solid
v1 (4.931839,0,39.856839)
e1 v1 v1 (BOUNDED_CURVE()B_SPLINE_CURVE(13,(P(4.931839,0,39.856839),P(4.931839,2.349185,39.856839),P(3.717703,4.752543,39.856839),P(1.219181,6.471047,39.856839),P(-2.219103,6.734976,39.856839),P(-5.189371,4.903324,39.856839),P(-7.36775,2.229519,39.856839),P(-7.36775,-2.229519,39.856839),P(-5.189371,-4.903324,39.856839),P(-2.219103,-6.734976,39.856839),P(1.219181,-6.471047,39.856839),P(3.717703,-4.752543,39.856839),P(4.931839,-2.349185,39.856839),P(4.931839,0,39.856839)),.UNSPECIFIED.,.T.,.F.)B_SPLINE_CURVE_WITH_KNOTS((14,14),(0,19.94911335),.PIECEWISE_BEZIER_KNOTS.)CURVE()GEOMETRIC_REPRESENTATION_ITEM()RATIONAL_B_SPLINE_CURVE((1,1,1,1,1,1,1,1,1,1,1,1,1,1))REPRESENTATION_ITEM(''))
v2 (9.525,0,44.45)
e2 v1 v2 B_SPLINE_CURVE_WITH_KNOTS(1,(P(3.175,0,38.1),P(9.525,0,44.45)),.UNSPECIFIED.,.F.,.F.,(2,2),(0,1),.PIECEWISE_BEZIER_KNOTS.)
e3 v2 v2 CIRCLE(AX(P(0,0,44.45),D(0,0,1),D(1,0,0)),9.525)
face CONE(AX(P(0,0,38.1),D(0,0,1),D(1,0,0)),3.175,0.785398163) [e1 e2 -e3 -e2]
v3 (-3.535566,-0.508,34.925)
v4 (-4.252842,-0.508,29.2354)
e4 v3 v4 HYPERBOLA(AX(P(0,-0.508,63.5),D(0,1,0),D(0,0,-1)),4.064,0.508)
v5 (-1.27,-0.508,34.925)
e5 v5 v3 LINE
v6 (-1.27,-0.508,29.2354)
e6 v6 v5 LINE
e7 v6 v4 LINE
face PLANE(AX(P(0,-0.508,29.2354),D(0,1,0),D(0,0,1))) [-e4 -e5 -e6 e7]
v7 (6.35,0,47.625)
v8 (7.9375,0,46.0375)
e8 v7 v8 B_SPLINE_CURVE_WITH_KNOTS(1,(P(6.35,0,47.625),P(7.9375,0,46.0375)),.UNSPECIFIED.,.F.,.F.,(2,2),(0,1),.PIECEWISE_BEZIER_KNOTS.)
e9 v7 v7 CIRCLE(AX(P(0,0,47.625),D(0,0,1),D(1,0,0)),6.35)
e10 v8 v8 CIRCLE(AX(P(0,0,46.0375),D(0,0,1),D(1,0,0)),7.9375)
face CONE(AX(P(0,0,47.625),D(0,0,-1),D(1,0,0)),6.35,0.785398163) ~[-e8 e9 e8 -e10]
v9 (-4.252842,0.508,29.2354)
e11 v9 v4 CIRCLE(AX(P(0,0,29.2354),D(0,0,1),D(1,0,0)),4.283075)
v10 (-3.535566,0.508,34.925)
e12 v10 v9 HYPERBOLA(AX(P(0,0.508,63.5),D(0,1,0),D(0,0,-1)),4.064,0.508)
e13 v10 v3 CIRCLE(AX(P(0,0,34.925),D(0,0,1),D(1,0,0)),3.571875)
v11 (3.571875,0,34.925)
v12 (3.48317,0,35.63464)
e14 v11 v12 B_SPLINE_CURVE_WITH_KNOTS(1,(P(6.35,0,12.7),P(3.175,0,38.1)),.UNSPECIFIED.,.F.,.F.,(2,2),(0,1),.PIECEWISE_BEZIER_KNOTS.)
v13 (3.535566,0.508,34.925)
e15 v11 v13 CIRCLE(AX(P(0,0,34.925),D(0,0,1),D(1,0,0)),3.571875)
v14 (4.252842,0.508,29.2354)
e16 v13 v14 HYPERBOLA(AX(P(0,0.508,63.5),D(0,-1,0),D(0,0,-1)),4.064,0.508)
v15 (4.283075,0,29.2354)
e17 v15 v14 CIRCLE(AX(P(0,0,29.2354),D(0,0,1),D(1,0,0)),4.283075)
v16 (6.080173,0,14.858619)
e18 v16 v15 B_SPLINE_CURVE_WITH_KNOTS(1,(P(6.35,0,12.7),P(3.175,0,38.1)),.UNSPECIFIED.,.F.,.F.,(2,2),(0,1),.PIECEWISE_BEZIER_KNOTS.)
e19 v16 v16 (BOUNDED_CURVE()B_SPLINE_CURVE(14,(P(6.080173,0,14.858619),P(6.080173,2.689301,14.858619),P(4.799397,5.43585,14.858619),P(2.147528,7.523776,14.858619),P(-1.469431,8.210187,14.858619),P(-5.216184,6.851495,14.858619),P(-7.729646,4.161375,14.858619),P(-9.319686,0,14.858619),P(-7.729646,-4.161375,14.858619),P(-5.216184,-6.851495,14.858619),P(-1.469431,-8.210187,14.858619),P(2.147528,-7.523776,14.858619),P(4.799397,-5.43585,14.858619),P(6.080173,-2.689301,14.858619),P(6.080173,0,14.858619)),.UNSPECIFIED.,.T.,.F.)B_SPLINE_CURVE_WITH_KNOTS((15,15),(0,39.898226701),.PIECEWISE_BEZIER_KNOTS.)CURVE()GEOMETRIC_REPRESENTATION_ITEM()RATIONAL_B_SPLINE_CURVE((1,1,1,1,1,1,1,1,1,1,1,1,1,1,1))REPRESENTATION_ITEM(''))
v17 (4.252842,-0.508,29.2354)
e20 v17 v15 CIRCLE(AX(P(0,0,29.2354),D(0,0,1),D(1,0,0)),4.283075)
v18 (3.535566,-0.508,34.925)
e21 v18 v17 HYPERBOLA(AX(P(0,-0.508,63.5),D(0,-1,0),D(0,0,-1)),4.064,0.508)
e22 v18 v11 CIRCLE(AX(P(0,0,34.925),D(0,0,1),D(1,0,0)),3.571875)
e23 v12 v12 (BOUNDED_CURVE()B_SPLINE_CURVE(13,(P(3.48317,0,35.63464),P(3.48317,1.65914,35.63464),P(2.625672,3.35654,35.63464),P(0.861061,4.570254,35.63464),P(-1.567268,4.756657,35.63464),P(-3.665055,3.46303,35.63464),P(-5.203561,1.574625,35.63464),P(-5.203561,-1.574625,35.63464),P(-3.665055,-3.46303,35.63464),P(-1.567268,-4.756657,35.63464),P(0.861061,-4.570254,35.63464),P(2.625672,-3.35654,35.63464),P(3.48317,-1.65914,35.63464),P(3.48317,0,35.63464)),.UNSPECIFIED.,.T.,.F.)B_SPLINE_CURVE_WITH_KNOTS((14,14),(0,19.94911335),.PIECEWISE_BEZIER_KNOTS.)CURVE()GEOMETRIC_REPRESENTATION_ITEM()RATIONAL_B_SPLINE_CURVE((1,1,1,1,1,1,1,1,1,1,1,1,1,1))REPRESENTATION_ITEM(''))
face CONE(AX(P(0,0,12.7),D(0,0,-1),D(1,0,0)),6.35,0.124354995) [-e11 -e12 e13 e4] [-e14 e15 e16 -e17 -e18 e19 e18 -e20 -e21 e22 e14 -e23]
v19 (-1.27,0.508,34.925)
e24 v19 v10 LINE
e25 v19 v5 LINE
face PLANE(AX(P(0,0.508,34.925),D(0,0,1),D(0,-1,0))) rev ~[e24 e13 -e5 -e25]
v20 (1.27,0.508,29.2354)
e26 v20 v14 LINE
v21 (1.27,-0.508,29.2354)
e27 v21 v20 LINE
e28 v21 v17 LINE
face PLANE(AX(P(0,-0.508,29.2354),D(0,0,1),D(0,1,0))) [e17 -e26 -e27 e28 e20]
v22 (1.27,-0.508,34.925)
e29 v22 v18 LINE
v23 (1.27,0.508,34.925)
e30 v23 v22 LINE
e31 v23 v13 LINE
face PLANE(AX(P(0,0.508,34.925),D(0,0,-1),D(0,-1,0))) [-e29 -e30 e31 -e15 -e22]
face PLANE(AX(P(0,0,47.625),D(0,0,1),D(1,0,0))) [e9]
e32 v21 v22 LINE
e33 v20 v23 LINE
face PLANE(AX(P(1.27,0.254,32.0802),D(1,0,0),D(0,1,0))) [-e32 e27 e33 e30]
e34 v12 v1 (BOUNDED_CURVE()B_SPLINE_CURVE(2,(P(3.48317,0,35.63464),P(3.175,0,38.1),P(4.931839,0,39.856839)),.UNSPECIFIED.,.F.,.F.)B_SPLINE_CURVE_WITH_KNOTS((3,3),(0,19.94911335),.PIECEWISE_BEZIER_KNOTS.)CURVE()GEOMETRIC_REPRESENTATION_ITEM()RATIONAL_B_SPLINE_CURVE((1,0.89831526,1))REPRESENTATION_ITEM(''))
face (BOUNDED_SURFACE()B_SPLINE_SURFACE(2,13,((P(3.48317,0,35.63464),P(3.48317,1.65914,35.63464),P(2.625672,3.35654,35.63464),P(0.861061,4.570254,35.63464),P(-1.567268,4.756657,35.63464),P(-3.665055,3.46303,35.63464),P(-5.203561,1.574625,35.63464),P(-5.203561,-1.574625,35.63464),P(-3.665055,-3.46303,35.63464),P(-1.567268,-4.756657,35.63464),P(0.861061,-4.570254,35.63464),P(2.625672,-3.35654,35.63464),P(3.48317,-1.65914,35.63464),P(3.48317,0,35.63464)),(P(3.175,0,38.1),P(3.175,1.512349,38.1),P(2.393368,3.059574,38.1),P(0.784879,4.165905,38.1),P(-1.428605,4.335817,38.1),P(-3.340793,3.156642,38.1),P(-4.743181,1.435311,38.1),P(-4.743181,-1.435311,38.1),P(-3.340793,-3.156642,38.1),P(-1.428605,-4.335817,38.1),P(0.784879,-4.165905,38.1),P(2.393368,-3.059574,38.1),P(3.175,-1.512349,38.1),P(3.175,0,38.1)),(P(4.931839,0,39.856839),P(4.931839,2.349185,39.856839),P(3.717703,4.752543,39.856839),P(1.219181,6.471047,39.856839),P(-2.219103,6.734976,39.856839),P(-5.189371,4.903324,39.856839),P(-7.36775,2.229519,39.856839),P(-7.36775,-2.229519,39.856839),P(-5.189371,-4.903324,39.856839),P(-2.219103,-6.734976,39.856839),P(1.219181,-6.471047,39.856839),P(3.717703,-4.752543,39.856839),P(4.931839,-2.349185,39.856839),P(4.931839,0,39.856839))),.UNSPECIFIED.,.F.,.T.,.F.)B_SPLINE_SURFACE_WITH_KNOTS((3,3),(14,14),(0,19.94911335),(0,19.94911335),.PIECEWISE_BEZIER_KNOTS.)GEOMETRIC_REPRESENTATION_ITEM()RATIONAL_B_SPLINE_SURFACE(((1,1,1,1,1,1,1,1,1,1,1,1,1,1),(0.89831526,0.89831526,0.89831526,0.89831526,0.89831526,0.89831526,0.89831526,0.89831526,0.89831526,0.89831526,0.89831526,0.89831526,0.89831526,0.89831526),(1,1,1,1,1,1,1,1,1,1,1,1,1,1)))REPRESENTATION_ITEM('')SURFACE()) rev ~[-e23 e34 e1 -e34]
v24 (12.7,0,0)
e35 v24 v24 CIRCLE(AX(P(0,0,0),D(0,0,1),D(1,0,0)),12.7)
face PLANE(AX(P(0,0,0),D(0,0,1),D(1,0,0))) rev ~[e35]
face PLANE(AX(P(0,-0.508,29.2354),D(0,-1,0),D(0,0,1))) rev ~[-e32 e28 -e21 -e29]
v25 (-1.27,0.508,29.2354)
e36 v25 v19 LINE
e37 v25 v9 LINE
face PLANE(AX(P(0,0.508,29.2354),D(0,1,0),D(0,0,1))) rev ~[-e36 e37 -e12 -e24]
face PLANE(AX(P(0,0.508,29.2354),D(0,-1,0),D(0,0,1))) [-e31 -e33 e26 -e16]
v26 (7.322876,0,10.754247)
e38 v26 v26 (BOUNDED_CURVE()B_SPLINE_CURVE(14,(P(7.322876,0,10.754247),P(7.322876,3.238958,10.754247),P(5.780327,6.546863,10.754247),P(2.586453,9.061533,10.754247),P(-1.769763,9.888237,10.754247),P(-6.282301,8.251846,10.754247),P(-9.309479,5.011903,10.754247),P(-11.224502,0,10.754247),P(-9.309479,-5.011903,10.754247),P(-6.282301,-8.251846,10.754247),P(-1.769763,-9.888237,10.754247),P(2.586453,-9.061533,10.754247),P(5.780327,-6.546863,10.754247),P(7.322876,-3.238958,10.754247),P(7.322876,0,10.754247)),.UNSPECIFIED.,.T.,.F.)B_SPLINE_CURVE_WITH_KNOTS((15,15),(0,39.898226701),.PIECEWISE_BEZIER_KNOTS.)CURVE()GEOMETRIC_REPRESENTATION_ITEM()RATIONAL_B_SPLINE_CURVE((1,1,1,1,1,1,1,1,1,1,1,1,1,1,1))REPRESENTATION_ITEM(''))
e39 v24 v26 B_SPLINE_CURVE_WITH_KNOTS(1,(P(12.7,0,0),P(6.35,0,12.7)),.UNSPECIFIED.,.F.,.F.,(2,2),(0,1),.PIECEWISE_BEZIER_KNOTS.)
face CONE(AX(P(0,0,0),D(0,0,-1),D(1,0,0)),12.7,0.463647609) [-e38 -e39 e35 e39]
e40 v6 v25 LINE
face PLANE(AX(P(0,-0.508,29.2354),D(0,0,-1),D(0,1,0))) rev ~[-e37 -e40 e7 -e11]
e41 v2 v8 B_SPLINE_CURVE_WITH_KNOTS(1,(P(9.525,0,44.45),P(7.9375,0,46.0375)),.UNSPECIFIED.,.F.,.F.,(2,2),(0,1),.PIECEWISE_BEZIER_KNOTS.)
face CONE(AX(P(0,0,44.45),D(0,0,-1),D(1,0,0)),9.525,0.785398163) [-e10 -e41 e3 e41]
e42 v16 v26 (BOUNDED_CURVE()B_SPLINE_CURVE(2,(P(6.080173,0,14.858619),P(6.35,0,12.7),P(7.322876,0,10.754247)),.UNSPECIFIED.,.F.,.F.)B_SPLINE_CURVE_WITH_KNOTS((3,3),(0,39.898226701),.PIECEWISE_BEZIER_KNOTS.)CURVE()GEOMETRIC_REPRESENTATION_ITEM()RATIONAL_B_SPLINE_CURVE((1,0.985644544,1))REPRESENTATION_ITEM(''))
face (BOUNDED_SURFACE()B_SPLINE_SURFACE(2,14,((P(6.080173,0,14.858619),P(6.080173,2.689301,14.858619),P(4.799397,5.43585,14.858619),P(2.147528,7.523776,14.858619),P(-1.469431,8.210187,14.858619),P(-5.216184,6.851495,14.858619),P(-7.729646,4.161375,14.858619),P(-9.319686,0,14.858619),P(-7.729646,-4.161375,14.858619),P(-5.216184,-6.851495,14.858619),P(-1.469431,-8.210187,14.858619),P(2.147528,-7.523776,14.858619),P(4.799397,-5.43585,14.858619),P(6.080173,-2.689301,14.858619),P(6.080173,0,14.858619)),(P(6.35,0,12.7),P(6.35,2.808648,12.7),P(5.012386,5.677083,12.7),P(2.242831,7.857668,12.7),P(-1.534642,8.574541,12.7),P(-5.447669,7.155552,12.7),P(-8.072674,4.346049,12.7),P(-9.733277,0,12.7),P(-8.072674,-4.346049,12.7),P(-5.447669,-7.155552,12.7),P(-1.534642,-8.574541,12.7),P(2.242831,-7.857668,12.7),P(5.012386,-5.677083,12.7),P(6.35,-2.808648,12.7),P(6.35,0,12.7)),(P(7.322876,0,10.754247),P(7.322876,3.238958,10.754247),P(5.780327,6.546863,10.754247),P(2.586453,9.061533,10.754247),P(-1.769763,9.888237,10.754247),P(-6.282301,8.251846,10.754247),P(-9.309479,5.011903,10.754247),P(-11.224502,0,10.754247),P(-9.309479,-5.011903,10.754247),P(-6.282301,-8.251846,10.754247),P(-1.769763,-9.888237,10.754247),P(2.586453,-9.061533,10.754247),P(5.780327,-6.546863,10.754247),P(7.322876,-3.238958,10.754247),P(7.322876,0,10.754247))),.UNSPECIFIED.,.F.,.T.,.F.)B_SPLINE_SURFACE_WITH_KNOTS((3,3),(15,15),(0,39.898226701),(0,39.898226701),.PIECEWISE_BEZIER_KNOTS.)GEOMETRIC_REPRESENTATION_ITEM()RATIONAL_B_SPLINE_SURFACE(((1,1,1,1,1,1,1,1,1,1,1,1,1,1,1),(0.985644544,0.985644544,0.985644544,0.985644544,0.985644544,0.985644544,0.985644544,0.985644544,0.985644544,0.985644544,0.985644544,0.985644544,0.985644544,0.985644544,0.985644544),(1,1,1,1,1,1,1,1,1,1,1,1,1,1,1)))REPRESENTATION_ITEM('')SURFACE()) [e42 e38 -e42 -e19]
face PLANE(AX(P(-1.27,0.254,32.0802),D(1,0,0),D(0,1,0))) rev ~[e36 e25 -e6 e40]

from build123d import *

# Parameters (mm, degrees)
F0_R           = 12.7
F2_R           = 6.35
F3_FACE_R      = 6.35
F5_R           = 3.175
F6_FACE_R      = 3.175
F8_R           = 9.525
F10_R          = 12.7
F11_R          = 5.08
F9_FACE_R      = 9.525
F13_R          = 7.9375
F16_R          = 6.35
F14_FACE_R     = 7.9375
F18_W          = 0.508
F18_H          = 5.6896
F19_DEPTH      = 12.7010001
F19_DEPTH_BACK = 25.4
F20_DEPTH      = 1.27


with BuildPart() as f3:
    # F0 (on Top) → F3 section 0
    with BuildSketch(Plane.XY):
        Circle(F0_R)
    # F2 (on offset) → F3 section 1
    with BuildSketch(Plane.XY.offset(12.7)):
        Circle(F2_R)
    loft()

    # F3_face (on face) → F6 section 0
    with BuildSketch(Plane.XY.offset(12.7)):
        Circle(F3_FACE_R)
    # F5 (on offset) → F6 section 1
    with BuildSketch(Plane.XY.offset(38.1)):
        Circle(F5_R)
    loft()

    # F6_face (on face) → F9 section 0
    with BuildSketch(Plane.XY.offset(38.1)):
        Circle(F6_FACE_R)
    # F8 (on offset) → F9 section 1
    with BuildSketch(Plane.XY.offset(44.45)):
        Circle(F8_R)
    loft()

    # F10
    f10_edges = [f3.edges().sort_by_distance(p)[0] for p in [
        (-6.35, 0, 12.7),
    ]]
    fillet(f10_edges, radius=F10_R)

    # F11
    f11_edges = [f3.edges().sort_by_distance(p)[0] for p in [
        (-3.175, 0, 38.1),
    ]]
    fillet(f11_edges, radius=F11_R)

    # F9_face (on face) → F14 section 0
    with BuildSketch(Plane.XY.offset(44.45)):
        Circle(F9_FACE_R)
    # F13 (on offset) → F14 section 1
    with BuildSketch(Plane.XY.offset(46.0375)):
        Circle(F13_R)
    loft()

    # F16 (on offset) → F17 section 0
    with BuildSketch(Plane.XY.offset(47.625)):
        Circle(F16_R)
    # F14_face (on face) → F17 section 1
    with BuildSketch(Plane.XY.offset(46.0375)):
        Circle(F14_FACE_R)
    loft()

    # F18 (on Right) → F19 (cut, two sides)
    with BuildSketch(Plane.YZ) as f19_sk:
        with Locations((0.254, 32.0802)):
            Rectangle(F18_W, F18_H)
        with Locations((-0.254, 32.0802)):
            Rectangle(F18_W, F18_H)
    extrude(amount=-F19_DEPTH, mode=Mode.SUBTRACT)
    extrude(f19_sk.sketch, amount=F19_DEPTH_BACK, mode=Mode.SUBTRACT)

    # F18 (on Right) → F20 (join, symmetric)
    with BuildSketch(Plane.YZ):
        with Locations((0.254, 32.0802)):
            Rectangle(F18_W, F18_H)
        with Locations((-0.254, 32.0802)):
            Rectangle(F18_W, F18_H)
    extrude(amount=F20_DEPTH, both=True)


solid = f3.part
